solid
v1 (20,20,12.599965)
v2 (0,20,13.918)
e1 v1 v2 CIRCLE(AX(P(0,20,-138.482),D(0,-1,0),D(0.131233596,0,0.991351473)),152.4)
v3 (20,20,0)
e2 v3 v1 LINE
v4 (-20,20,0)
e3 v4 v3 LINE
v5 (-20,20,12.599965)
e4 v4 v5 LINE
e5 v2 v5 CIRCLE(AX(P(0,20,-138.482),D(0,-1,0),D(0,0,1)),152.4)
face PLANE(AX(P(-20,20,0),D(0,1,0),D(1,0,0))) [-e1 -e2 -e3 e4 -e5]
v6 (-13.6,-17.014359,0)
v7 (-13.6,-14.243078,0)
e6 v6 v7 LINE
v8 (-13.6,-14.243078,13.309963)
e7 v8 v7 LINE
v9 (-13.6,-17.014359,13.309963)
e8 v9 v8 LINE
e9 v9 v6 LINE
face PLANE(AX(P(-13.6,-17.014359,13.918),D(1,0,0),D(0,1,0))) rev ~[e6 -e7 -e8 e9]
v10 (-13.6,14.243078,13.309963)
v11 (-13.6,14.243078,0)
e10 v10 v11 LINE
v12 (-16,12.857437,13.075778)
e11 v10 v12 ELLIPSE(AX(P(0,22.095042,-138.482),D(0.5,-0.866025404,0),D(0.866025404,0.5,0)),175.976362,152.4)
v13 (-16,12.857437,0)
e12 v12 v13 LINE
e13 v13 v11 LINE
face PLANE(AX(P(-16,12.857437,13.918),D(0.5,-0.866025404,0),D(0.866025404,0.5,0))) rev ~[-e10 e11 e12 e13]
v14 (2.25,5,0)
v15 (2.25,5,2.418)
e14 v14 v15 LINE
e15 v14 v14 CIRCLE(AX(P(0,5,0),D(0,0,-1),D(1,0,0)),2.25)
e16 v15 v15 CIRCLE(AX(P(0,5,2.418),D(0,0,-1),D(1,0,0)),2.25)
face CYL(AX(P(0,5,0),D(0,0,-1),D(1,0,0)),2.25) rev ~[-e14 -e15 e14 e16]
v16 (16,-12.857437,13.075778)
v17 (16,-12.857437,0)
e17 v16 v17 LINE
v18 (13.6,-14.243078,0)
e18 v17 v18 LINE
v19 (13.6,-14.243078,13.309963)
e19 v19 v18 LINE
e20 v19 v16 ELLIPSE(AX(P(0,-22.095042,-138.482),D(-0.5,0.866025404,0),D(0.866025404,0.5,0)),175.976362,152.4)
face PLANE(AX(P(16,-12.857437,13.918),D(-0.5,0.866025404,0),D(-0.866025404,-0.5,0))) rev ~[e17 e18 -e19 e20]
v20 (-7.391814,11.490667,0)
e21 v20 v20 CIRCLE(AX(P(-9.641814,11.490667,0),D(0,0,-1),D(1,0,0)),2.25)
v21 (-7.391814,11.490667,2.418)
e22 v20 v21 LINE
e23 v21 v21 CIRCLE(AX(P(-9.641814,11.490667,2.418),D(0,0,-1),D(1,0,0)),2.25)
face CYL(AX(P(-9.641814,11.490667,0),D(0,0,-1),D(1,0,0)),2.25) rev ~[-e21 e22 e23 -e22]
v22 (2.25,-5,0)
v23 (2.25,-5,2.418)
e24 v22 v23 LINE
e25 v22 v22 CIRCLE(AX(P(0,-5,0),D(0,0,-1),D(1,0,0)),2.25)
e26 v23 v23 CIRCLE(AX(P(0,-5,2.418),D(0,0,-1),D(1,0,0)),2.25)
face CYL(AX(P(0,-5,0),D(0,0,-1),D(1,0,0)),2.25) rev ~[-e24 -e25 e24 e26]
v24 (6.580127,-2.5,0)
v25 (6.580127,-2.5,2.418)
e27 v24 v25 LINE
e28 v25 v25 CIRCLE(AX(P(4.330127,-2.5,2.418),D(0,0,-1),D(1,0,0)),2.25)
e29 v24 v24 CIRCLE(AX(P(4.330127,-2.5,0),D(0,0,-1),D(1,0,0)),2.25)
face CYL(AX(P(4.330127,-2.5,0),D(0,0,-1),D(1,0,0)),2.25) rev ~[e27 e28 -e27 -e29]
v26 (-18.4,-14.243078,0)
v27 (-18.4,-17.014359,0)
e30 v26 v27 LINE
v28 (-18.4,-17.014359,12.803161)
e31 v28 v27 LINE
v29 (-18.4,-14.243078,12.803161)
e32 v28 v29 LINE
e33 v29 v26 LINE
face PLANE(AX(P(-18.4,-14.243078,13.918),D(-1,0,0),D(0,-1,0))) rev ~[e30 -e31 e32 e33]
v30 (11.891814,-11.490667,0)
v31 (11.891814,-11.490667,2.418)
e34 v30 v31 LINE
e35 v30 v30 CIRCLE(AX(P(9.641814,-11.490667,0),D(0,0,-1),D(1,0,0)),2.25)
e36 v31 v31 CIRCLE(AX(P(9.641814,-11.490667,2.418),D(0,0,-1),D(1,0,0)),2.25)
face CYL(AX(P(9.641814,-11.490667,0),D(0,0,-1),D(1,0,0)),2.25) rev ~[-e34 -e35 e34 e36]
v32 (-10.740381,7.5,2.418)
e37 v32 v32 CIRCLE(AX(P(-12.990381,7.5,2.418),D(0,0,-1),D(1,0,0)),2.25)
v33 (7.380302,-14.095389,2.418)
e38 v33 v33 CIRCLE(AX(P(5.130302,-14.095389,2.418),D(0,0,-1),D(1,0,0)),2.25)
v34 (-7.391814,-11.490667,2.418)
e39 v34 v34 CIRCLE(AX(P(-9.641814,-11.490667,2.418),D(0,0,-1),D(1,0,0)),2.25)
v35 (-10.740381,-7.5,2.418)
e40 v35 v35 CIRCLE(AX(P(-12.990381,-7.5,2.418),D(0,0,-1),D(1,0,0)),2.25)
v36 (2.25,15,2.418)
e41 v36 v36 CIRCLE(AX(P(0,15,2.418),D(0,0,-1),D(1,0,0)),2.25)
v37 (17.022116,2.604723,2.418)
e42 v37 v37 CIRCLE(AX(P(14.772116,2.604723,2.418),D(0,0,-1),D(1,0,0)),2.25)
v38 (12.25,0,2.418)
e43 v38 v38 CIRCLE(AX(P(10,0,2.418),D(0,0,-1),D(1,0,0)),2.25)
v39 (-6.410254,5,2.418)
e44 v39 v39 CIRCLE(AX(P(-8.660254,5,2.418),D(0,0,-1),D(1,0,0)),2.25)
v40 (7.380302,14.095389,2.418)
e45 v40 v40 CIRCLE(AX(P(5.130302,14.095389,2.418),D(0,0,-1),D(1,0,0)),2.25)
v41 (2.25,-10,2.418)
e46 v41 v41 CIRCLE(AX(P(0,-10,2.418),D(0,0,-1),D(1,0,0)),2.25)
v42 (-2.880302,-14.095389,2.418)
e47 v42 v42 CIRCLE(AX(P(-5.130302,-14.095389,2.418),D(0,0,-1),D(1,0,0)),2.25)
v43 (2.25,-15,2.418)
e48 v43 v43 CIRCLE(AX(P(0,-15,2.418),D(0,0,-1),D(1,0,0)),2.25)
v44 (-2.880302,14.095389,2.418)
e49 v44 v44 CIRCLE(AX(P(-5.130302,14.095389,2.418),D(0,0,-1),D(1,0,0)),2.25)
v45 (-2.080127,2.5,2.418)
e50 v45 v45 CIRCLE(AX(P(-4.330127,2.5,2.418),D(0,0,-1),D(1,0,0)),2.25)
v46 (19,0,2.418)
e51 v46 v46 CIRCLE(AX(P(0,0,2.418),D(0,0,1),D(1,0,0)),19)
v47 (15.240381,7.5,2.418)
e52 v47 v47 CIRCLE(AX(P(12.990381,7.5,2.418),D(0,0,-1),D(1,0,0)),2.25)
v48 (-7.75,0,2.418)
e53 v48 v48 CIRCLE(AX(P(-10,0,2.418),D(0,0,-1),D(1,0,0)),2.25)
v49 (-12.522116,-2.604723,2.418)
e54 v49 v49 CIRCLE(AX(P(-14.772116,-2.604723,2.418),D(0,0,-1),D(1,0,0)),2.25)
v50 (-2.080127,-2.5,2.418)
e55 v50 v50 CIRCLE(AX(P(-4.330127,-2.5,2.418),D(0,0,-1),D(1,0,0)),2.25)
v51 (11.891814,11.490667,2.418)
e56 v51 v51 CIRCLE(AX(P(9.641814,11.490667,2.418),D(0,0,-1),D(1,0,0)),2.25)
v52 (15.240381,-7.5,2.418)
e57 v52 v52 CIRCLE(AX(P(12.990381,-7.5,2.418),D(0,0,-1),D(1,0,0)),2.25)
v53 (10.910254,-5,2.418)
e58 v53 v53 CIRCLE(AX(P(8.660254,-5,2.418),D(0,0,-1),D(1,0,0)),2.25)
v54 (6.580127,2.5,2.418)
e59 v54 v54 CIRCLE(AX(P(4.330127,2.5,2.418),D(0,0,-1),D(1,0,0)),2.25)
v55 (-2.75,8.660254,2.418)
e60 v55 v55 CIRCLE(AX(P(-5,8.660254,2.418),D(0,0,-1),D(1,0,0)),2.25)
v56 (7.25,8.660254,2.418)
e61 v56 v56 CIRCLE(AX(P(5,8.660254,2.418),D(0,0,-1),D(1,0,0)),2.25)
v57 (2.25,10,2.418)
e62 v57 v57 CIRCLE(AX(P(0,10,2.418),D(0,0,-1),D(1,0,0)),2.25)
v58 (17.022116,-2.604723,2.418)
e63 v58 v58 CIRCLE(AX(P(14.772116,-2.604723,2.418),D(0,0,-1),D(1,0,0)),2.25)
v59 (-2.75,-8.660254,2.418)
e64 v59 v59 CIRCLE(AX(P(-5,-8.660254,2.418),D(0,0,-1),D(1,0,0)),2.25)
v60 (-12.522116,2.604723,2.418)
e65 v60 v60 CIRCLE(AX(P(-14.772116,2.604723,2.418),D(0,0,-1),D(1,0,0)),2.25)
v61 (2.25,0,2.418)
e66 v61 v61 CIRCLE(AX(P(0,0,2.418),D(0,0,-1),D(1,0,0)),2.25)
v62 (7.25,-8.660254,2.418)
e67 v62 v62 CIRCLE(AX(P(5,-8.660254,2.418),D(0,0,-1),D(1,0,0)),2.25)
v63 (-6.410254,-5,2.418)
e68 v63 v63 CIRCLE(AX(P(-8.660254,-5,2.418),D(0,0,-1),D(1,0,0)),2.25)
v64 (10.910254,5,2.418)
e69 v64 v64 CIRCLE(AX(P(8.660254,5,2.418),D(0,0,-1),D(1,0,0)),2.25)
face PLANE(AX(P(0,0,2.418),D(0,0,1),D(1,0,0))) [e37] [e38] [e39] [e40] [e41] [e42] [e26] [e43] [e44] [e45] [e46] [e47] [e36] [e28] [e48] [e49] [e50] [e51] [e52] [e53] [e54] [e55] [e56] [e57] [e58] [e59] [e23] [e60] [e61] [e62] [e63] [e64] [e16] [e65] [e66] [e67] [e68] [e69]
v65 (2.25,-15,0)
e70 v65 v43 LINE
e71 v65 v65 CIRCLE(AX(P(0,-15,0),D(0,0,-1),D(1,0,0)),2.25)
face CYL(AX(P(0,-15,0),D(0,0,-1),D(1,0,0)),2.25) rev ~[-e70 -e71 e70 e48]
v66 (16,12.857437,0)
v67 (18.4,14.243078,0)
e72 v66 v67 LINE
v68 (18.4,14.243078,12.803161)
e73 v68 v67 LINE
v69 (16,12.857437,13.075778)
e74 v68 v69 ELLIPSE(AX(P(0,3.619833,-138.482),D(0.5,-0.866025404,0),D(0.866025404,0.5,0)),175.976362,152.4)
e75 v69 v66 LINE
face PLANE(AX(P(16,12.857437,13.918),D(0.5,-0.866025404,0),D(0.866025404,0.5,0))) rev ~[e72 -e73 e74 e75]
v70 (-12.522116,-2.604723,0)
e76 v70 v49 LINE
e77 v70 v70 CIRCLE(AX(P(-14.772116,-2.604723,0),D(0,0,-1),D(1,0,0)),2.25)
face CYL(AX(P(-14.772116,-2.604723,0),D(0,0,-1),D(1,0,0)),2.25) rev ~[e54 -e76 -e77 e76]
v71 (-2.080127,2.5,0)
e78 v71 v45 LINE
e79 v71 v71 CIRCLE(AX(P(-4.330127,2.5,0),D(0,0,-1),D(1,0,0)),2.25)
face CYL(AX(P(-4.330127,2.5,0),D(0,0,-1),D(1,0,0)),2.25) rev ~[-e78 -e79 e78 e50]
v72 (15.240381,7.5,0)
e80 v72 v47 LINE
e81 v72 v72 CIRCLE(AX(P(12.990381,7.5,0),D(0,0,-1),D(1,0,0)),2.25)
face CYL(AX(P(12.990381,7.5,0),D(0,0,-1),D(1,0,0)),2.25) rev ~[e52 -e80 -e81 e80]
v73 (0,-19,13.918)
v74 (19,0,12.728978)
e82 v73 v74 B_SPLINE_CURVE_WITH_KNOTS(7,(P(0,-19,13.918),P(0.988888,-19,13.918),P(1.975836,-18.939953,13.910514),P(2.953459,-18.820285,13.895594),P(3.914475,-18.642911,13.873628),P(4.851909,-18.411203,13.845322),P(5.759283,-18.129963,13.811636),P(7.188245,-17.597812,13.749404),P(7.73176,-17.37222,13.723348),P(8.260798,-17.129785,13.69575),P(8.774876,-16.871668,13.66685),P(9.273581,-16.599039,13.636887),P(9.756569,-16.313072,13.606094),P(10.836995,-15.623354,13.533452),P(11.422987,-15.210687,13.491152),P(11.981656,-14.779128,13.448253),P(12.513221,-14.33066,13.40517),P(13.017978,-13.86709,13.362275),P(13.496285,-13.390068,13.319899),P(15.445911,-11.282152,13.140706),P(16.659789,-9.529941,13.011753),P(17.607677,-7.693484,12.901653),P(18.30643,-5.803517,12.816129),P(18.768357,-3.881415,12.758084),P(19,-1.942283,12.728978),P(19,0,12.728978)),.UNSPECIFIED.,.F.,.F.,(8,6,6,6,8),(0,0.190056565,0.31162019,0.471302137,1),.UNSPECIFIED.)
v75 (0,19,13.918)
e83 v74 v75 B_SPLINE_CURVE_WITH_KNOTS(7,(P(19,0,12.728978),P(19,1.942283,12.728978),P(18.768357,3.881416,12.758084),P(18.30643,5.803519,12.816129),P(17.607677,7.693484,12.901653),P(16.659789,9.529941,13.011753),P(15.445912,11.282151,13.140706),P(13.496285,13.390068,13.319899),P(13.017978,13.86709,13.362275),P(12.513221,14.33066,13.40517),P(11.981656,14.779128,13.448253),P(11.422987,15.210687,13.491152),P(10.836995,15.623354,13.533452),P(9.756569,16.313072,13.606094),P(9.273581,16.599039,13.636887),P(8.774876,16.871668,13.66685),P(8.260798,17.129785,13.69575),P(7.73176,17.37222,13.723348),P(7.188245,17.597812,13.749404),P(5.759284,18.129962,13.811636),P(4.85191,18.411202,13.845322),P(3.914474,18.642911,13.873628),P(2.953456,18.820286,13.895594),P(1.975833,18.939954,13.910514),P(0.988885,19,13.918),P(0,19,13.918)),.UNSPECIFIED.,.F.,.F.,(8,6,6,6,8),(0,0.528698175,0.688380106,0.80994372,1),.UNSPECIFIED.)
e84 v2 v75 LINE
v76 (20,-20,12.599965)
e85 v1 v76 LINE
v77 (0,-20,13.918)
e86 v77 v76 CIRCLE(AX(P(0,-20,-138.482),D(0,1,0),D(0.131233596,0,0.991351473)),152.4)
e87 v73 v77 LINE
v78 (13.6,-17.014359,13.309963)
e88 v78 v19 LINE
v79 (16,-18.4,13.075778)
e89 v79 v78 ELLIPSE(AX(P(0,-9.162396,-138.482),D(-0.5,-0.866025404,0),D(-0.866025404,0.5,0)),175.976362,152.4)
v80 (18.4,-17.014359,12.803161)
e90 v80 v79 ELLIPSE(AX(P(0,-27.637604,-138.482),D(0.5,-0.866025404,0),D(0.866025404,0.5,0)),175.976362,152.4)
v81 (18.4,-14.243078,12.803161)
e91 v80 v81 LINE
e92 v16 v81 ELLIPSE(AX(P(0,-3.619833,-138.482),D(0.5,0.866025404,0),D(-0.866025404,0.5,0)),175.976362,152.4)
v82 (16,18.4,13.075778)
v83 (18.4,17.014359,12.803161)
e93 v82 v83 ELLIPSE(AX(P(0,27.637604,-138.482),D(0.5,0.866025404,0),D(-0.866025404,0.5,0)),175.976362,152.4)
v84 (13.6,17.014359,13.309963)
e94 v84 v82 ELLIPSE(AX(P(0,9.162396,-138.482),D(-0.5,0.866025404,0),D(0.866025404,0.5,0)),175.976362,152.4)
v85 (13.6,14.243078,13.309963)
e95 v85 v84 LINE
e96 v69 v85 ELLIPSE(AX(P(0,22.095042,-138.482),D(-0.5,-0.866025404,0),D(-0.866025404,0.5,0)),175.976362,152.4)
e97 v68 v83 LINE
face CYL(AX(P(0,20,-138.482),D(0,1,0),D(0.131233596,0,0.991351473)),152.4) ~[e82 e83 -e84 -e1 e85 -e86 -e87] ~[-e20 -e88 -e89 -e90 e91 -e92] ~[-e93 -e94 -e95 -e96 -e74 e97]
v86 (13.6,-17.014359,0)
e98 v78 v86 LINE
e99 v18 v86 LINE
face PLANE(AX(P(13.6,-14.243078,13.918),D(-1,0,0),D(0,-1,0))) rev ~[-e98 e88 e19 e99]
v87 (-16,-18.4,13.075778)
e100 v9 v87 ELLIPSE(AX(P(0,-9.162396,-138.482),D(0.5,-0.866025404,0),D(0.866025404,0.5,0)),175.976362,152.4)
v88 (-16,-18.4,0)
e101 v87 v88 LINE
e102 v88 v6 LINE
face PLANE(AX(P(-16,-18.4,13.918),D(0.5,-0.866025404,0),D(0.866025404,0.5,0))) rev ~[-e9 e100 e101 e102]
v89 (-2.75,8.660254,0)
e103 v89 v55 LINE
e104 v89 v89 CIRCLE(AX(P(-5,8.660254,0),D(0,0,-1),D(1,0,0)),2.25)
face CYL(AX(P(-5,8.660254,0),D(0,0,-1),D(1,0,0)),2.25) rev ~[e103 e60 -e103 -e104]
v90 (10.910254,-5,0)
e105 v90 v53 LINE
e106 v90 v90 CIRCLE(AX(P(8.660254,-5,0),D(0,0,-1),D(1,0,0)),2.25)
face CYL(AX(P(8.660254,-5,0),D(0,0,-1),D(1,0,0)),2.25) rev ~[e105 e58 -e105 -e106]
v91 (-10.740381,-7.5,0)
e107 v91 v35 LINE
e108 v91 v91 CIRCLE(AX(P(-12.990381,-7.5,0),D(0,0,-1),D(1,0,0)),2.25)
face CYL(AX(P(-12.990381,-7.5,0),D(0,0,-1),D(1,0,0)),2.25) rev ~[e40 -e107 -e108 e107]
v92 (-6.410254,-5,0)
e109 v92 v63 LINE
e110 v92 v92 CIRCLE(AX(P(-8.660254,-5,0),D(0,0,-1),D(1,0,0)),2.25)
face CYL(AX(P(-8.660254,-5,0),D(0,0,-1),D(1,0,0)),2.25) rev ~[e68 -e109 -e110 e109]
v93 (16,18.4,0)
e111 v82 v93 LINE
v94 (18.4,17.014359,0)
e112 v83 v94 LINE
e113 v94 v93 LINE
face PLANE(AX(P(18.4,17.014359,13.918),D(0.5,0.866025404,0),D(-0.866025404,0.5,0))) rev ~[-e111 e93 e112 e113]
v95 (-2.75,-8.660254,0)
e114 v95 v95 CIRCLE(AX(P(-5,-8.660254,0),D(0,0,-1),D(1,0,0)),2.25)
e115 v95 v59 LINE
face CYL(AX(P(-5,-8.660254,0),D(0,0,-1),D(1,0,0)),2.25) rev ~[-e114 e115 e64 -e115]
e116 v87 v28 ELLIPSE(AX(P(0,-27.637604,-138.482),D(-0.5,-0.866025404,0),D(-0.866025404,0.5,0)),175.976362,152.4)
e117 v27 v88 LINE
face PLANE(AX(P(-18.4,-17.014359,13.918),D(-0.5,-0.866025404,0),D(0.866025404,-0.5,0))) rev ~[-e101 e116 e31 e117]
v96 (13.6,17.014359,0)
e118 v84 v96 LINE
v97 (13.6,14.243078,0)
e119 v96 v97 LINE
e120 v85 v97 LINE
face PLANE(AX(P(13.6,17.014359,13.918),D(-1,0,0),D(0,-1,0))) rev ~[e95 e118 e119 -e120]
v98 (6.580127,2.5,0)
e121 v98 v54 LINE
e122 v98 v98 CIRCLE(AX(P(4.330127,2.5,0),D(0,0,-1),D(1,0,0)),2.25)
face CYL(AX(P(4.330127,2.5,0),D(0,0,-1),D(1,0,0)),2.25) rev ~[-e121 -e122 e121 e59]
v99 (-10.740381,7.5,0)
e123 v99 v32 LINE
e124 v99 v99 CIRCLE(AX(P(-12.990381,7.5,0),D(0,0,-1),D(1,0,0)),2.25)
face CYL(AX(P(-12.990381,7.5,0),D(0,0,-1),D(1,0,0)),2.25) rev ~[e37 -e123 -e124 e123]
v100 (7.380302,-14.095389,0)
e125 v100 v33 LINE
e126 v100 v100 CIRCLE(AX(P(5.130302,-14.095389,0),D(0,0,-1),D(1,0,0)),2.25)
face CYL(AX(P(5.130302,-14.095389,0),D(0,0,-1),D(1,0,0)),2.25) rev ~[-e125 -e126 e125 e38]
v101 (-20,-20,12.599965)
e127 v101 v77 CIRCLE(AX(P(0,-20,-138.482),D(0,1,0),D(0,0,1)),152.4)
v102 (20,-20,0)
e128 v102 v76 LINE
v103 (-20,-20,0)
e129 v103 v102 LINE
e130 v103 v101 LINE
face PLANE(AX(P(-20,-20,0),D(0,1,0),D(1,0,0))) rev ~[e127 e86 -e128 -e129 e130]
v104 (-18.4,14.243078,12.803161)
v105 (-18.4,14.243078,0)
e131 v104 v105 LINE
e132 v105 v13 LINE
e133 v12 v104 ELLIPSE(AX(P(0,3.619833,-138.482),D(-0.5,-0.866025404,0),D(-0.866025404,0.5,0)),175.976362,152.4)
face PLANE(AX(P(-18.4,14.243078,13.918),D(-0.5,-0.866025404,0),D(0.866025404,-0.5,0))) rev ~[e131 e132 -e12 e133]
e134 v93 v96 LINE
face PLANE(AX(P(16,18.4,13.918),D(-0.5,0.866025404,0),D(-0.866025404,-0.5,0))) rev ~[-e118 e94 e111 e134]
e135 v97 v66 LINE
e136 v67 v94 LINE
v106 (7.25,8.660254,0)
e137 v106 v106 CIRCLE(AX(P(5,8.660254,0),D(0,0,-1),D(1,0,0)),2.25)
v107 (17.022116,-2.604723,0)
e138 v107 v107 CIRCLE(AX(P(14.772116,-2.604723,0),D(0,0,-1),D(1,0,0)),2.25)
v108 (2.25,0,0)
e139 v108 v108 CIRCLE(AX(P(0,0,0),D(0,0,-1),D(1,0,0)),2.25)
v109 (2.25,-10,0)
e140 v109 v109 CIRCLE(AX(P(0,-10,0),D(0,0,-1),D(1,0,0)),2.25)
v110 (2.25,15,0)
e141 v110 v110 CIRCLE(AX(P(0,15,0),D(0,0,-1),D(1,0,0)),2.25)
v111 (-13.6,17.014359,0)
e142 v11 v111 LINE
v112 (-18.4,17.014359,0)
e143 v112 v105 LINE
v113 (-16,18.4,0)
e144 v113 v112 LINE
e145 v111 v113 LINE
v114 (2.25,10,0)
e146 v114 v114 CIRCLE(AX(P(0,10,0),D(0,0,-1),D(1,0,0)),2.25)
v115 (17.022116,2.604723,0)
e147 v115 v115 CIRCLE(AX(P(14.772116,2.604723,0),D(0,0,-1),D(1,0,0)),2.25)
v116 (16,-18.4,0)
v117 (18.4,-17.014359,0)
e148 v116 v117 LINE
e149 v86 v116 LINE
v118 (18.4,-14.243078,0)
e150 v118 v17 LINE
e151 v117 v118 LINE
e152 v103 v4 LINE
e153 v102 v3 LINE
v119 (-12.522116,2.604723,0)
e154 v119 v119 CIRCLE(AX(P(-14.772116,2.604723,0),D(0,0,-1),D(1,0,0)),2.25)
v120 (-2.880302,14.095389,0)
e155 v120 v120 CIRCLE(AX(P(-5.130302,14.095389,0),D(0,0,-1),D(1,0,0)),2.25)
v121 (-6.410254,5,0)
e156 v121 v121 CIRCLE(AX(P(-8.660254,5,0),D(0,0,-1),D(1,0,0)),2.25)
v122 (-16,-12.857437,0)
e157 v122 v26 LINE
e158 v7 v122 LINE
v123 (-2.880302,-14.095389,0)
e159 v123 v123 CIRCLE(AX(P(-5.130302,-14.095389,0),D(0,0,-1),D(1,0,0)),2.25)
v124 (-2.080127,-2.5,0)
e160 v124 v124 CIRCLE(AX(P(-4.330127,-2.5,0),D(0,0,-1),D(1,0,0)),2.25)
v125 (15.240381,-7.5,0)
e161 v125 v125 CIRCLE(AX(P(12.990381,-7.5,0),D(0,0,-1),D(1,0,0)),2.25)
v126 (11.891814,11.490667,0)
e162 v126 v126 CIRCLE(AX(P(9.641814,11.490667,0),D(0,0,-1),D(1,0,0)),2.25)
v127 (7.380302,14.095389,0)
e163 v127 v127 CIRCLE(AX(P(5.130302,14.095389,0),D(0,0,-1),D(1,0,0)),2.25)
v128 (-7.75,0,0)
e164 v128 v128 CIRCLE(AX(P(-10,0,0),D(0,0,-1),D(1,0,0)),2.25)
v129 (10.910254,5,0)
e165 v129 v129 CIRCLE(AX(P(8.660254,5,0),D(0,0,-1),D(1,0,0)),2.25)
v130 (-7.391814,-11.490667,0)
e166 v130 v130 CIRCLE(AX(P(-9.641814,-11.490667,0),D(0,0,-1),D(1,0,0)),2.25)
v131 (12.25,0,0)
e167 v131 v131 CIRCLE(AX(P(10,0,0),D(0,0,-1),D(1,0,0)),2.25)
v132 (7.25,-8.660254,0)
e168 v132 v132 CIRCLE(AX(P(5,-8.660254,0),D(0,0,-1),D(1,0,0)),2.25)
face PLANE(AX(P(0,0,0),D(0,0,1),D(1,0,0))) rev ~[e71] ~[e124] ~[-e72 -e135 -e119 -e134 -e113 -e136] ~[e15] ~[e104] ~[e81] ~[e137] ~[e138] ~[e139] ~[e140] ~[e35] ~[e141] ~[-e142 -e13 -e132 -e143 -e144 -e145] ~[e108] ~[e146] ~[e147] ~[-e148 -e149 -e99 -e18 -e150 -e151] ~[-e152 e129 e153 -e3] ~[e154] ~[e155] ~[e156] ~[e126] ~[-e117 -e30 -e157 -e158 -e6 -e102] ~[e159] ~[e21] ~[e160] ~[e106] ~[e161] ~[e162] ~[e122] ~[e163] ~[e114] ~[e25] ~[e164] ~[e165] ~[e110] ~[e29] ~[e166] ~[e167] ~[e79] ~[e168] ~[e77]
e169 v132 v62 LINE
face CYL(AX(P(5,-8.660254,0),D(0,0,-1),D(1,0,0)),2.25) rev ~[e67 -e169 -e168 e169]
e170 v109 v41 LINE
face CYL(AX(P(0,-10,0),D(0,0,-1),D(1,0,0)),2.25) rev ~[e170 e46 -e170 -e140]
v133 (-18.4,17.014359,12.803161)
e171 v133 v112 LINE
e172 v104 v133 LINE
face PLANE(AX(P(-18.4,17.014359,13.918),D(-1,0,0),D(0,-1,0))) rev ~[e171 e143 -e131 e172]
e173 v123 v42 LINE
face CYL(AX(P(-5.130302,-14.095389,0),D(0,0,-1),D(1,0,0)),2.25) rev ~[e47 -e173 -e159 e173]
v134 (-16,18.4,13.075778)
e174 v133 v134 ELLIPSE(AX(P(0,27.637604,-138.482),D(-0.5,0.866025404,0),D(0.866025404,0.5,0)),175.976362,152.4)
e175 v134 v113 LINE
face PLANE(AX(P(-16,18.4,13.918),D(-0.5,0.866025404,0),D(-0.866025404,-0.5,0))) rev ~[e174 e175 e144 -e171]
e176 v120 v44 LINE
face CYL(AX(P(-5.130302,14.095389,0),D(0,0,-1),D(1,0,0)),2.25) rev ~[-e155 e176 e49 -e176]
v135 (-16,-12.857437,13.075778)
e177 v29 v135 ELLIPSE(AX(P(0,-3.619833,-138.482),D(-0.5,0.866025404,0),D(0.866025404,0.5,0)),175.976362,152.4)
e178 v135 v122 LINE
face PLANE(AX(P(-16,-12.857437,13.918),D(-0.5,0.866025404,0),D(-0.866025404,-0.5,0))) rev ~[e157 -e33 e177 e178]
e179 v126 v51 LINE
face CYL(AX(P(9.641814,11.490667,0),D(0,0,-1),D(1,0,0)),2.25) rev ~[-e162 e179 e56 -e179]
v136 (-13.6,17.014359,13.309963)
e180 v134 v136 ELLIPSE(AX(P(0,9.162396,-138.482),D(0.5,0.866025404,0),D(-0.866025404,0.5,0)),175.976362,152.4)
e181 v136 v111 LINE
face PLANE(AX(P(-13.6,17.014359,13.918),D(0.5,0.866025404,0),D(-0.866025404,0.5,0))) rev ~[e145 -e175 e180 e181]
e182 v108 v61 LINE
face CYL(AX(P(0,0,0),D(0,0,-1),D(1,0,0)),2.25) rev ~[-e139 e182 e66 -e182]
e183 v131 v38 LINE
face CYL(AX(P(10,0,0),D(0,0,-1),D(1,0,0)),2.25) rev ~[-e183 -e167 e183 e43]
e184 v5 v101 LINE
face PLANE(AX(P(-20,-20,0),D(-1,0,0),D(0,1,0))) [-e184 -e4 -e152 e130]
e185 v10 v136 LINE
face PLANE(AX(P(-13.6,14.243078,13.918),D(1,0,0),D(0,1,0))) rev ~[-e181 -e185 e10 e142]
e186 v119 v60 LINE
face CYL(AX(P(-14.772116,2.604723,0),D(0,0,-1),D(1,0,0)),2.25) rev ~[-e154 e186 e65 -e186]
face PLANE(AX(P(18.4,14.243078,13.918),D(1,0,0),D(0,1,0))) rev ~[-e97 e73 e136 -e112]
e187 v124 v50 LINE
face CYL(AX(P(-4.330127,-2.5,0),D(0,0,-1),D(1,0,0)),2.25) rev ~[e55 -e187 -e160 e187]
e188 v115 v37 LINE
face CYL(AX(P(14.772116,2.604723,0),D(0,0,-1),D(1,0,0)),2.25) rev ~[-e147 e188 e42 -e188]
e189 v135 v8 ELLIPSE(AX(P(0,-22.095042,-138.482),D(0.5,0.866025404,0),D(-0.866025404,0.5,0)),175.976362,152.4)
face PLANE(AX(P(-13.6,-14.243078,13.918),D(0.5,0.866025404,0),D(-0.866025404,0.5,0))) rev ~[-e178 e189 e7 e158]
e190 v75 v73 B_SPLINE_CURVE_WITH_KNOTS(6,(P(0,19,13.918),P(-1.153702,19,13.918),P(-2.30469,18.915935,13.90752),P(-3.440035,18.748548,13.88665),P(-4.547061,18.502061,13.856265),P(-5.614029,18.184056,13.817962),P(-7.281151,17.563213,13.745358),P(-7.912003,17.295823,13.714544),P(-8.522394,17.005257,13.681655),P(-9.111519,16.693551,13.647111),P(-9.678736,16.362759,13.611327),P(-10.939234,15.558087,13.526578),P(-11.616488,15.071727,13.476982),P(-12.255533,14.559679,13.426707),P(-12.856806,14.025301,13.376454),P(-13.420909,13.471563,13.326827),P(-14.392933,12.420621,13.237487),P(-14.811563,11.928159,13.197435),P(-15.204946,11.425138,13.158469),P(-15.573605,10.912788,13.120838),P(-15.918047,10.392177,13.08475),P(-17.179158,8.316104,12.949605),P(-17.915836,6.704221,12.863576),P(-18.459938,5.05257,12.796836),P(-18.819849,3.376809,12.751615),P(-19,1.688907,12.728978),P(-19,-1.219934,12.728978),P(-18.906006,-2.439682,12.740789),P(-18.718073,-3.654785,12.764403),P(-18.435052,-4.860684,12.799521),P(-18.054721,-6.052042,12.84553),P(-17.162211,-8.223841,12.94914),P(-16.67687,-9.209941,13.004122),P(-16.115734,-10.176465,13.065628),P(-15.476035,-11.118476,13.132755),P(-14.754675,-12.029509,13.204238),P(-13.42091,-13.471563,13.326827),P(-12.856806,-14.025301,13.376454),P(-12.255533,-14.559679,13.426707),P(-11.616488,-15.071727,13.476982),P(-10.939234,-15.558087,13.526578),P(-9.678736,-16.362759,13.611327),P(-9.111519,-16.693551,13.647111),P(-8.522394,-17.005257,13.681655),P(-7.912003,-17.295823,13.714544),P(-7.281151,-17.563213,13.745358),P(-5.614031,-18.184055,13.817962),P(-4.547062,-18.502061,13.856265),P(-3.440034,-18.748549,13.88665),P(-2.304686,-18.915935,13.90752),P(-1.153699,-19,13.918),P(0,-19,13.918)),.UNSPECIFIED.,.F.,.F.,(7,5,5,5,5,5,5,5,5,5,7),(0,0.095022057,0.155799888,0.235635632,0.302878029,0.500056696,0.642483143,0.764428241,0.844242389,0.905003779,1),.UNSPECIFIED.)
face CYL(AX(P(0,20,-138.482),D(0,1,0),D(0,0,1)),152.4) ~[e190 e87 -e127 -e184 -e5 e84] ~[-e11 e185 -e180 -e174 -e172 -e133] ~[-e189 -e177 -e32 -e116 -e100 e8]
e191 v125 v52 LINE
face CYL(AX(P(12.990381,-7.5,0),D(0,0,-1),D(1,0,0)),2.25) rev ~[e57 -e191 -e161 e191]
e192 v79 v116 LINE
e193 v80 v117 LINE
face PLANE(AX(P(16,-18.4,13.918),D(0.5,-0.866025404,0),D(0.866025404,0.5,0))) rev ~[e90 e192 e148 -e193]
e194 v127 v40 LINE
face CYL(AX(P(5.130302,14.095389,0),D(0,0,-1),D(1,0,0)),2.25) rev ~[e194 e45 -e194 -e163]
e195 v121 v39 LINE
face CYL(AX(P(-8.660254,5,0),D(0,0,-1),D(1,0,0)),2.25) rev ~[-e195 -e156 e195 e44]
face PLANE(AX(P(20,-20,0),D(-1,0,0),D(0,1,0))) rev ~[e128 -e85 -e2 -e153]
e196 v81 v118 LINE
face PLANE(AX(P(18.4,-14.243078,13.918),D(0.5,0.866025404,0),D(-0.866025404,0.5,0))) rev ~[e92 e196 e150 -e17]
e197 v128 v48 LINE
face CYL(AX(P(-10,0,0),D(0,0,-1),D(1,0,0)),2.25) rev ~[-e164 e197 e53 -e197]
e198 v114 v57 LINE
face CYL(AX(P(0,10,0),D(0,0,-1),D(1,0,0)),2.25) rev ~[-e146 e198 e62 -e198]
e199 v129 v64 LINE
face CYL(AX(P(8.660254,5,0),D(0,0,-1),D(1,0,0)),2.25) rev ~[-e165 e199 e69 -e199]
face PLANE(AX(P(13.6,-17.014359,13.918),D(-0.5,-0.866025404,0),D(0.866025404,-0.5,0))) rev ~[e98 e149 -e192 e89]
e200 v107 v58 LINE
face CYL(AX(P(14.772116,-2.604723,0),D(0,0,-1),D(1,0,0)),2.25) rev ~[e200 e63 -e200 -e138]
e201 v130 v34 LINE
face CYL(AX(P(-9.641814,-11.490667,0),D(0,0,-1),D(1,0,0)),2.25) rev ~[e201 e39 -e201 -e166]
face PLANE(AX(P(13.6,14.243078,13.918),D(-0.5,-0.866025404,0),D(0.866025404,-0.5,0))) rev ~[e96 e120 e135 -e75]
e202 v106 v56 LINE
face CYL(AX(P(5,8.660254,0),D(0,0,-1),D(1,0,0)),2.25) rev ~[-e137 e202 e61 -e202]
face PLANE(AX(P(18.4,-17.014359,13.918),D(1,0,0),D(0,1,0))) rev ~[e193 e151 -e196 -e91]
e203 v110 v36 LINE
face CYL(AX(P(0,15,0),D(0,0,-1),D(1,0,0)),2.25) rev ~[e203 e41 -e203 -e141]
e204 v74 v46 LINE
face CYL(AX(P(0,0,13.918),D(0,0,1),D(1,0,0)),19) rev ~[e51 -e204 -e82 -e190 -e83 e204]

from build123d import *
from build123d import SkipClean  # not in build123d's __all__

# Parameters (mm, degrees)
F0_W     = 40
F0_H     = 40
F1_DEPTH = 13.918
F3_DEPTH = 25
F4_R     = 19
F5_DEPTH = 11.5
F7_DEPTH = 50
F8_R     = 2.25
F9_DEPTH = 25


with BuildPart() as f1:
    # F0 (on Top) → F1 (new body)
    with BuildSketch(Plane.XY):
        Rectangle(F0_W, F0_H)
    extrude(amount=F1_DEPTH)

    # F2 (on face) → F3 (cut)
    with BuildSketch(Plane.XY.offset(13.918)):
        Polygon((-13.6, 17.0143593539), (-16, 18.4), (-18.4, 17.0143593539), (-18.4, 14.2430780618), (-16, 12.8574374158), (-13.6, 14.2430780618), align=None)
        Polygon((13.6, 17.0143593539), (13.6, 14.2430780618), (16, 12.8574374158), (18.4, 14.2430780618), (18.4, 17.0143593539), (16, 18.4), align=None)
        Polygon((-13.6, -17.0143593539), (-13.6, -14.2430780618), (-16, -12.8574374158), (-18.4, -14.2430780618), (-18.4, -17.0143593539), (-16, -18.4), align=None)
        Polygon((18.4, -14.2430780618), (16, -12.8574374158), (13.6, -14.2430780618), (13.6, -17.0143593539), (16, -18.4), (18.4, -17.0143593539), align=None)
    extrude(amount=-F3_DEPTH, mode=Mode.SUBTRACT)

    # F4 (on face) → F5 (cut)
    with BuildSketch(Plane.XY.offset(13.918)):
        Circle(F4_R)
    extrude(amount=-F5_DEPTH, mode=Mode.SUBTRACT)

    # F6 (on face) → F7 (cut)
    with BuildSketch(Plane(origin=(0, 20, 0), x_dir=(-1, 0, 0), z_dir=(0, 1, 0))):
        with BuildLine():
            ThreePointArc((-20, 12.5999645093), (-10.021691693, 13.5881341343), (0, 13.918))
            Line((0, 13.918), (-20, 13.918))
            Line((-20, 13.918), (-20, 12.5999645093))
        make_face()
        with BuildLine():
            ThreePointArc((0, 13.918), (10.021691693, 13.5881341343), (20, 12.5999645093))
            Line((20, 12.5999645093), (20, 13.918))
            Line((20, 13.918), (0, 13.918))
        make_face()
    with SkipClean():  # cleaning this boolean's faces spoils the solid; the shape is the same uncleaned
        extrude(amount=-F7_DEPTH, mode=Mode.SUBTRACT)

    # F8 (on face) → F9 (cut)
    with BuildSketch(Plane(origin=(0, 0, 0), x_dir=(1, 0, 0), z_dir=(0, 0, -1))):
        Circle(F8_R)
        with Locations((0, 5)):
            Circle(F8_R)
        with Locations((-4.3301270189, 2.5)):
            Circle(F8_R)
        with Locations((-4.3301270189, -2.5)):
            Circle(F8_R)
        with Locations((0, -5)):
            Circle(F8_R)
        with Locations((4.3301270189, -2.5)):
            Circle(F8_R)
        with Locations((4.3301270189, 2.5)):
            Circle(F8_R)
        with Locations((0, 10)):
            Circle(F8_R)
        with Locations((0, 15)):
            Circle(F8_R)
        with Locations((-5.1303021499, 14.0953893118)):
            Circle(F8_R)
        with Locations((-9.6418141453, 11.4906666468)):
            Circle(F8_R)
        with Locations((-12.9903810568, 7.5)):
            Circle(F8_R)
        with Locations((-14.7721162952, 2.604722665)):
            Circle(F8_R)
        with Locations((-14.7721162952, -2.604722665)):
            Circle(F8_R)
        with Locations((-12.9903810568, -7.5)):
            Circle(F8_R)
        with Locations((-9.6418141453, -11.4906666468)):
            Circle(F8_R)
        with Locations((-5.1303021499, -14.0953893118)):
            Circle(F8_R)
        with Locations((0, -15)):
            Circle(F8_R)
        with Locations((5.1303021499, -14.0953893118)):
            Circle(F8_R)
        with Locations((9.6418141453, -11.4906666468)):
            Circle(F8_R)
        with Locations((12.9903810568, -7.5)):
            Circle(F8_R)
        with Locations((14.7721162952, -2.604722665)):
            Circle(F8_R)
        with Locations((14.7721162952, 2.604722665)):
            Circle(F8_R)
        with Locations((12.9903810568, 7.5)):
            Circle(F8_R)
        with Locations((9.6418141453, 11.4906666468)):
            Circle(F8_R)
        with Locations((5.1303021499, 14.0953893118)):
            Circle(F8_R)
        with Locations((-5, 8.6602540378)):
            Circle(F8_R)
        with Locations((-8.6602540378, 5)):
            Circle(F8_R)
        with Locations((-10, 0)):
            Circle(F8_R)
        with Locations((-8.6602540378, -5)):
            Circle(F8_R)
        with Locations((-5, -8.6602540378)):
            Circle(F8_R)
        with Locations((0, -10)):
            Circle(F8_R)
        with Locations((5, -8.6602540378)):
            Circle(F8_R)
        with Locations((8.6602540378, -5)):
            Circle(F8_R)
        with Locations((10, 0)):
            Circle(F8_R)
        with Locations((8.6602540378, 5)):
            Circle(F8_R)
        with Locations((5, 8.6602540378)):
            Circle(F8_R)
    with SkipClean():  # cleaning this boolean's faces spoils the solid; the shape is the same uncleaned
        extrude(amount=-F9_DEPTH, mode=Mode.SUBTRACT)


solid = f1.part
